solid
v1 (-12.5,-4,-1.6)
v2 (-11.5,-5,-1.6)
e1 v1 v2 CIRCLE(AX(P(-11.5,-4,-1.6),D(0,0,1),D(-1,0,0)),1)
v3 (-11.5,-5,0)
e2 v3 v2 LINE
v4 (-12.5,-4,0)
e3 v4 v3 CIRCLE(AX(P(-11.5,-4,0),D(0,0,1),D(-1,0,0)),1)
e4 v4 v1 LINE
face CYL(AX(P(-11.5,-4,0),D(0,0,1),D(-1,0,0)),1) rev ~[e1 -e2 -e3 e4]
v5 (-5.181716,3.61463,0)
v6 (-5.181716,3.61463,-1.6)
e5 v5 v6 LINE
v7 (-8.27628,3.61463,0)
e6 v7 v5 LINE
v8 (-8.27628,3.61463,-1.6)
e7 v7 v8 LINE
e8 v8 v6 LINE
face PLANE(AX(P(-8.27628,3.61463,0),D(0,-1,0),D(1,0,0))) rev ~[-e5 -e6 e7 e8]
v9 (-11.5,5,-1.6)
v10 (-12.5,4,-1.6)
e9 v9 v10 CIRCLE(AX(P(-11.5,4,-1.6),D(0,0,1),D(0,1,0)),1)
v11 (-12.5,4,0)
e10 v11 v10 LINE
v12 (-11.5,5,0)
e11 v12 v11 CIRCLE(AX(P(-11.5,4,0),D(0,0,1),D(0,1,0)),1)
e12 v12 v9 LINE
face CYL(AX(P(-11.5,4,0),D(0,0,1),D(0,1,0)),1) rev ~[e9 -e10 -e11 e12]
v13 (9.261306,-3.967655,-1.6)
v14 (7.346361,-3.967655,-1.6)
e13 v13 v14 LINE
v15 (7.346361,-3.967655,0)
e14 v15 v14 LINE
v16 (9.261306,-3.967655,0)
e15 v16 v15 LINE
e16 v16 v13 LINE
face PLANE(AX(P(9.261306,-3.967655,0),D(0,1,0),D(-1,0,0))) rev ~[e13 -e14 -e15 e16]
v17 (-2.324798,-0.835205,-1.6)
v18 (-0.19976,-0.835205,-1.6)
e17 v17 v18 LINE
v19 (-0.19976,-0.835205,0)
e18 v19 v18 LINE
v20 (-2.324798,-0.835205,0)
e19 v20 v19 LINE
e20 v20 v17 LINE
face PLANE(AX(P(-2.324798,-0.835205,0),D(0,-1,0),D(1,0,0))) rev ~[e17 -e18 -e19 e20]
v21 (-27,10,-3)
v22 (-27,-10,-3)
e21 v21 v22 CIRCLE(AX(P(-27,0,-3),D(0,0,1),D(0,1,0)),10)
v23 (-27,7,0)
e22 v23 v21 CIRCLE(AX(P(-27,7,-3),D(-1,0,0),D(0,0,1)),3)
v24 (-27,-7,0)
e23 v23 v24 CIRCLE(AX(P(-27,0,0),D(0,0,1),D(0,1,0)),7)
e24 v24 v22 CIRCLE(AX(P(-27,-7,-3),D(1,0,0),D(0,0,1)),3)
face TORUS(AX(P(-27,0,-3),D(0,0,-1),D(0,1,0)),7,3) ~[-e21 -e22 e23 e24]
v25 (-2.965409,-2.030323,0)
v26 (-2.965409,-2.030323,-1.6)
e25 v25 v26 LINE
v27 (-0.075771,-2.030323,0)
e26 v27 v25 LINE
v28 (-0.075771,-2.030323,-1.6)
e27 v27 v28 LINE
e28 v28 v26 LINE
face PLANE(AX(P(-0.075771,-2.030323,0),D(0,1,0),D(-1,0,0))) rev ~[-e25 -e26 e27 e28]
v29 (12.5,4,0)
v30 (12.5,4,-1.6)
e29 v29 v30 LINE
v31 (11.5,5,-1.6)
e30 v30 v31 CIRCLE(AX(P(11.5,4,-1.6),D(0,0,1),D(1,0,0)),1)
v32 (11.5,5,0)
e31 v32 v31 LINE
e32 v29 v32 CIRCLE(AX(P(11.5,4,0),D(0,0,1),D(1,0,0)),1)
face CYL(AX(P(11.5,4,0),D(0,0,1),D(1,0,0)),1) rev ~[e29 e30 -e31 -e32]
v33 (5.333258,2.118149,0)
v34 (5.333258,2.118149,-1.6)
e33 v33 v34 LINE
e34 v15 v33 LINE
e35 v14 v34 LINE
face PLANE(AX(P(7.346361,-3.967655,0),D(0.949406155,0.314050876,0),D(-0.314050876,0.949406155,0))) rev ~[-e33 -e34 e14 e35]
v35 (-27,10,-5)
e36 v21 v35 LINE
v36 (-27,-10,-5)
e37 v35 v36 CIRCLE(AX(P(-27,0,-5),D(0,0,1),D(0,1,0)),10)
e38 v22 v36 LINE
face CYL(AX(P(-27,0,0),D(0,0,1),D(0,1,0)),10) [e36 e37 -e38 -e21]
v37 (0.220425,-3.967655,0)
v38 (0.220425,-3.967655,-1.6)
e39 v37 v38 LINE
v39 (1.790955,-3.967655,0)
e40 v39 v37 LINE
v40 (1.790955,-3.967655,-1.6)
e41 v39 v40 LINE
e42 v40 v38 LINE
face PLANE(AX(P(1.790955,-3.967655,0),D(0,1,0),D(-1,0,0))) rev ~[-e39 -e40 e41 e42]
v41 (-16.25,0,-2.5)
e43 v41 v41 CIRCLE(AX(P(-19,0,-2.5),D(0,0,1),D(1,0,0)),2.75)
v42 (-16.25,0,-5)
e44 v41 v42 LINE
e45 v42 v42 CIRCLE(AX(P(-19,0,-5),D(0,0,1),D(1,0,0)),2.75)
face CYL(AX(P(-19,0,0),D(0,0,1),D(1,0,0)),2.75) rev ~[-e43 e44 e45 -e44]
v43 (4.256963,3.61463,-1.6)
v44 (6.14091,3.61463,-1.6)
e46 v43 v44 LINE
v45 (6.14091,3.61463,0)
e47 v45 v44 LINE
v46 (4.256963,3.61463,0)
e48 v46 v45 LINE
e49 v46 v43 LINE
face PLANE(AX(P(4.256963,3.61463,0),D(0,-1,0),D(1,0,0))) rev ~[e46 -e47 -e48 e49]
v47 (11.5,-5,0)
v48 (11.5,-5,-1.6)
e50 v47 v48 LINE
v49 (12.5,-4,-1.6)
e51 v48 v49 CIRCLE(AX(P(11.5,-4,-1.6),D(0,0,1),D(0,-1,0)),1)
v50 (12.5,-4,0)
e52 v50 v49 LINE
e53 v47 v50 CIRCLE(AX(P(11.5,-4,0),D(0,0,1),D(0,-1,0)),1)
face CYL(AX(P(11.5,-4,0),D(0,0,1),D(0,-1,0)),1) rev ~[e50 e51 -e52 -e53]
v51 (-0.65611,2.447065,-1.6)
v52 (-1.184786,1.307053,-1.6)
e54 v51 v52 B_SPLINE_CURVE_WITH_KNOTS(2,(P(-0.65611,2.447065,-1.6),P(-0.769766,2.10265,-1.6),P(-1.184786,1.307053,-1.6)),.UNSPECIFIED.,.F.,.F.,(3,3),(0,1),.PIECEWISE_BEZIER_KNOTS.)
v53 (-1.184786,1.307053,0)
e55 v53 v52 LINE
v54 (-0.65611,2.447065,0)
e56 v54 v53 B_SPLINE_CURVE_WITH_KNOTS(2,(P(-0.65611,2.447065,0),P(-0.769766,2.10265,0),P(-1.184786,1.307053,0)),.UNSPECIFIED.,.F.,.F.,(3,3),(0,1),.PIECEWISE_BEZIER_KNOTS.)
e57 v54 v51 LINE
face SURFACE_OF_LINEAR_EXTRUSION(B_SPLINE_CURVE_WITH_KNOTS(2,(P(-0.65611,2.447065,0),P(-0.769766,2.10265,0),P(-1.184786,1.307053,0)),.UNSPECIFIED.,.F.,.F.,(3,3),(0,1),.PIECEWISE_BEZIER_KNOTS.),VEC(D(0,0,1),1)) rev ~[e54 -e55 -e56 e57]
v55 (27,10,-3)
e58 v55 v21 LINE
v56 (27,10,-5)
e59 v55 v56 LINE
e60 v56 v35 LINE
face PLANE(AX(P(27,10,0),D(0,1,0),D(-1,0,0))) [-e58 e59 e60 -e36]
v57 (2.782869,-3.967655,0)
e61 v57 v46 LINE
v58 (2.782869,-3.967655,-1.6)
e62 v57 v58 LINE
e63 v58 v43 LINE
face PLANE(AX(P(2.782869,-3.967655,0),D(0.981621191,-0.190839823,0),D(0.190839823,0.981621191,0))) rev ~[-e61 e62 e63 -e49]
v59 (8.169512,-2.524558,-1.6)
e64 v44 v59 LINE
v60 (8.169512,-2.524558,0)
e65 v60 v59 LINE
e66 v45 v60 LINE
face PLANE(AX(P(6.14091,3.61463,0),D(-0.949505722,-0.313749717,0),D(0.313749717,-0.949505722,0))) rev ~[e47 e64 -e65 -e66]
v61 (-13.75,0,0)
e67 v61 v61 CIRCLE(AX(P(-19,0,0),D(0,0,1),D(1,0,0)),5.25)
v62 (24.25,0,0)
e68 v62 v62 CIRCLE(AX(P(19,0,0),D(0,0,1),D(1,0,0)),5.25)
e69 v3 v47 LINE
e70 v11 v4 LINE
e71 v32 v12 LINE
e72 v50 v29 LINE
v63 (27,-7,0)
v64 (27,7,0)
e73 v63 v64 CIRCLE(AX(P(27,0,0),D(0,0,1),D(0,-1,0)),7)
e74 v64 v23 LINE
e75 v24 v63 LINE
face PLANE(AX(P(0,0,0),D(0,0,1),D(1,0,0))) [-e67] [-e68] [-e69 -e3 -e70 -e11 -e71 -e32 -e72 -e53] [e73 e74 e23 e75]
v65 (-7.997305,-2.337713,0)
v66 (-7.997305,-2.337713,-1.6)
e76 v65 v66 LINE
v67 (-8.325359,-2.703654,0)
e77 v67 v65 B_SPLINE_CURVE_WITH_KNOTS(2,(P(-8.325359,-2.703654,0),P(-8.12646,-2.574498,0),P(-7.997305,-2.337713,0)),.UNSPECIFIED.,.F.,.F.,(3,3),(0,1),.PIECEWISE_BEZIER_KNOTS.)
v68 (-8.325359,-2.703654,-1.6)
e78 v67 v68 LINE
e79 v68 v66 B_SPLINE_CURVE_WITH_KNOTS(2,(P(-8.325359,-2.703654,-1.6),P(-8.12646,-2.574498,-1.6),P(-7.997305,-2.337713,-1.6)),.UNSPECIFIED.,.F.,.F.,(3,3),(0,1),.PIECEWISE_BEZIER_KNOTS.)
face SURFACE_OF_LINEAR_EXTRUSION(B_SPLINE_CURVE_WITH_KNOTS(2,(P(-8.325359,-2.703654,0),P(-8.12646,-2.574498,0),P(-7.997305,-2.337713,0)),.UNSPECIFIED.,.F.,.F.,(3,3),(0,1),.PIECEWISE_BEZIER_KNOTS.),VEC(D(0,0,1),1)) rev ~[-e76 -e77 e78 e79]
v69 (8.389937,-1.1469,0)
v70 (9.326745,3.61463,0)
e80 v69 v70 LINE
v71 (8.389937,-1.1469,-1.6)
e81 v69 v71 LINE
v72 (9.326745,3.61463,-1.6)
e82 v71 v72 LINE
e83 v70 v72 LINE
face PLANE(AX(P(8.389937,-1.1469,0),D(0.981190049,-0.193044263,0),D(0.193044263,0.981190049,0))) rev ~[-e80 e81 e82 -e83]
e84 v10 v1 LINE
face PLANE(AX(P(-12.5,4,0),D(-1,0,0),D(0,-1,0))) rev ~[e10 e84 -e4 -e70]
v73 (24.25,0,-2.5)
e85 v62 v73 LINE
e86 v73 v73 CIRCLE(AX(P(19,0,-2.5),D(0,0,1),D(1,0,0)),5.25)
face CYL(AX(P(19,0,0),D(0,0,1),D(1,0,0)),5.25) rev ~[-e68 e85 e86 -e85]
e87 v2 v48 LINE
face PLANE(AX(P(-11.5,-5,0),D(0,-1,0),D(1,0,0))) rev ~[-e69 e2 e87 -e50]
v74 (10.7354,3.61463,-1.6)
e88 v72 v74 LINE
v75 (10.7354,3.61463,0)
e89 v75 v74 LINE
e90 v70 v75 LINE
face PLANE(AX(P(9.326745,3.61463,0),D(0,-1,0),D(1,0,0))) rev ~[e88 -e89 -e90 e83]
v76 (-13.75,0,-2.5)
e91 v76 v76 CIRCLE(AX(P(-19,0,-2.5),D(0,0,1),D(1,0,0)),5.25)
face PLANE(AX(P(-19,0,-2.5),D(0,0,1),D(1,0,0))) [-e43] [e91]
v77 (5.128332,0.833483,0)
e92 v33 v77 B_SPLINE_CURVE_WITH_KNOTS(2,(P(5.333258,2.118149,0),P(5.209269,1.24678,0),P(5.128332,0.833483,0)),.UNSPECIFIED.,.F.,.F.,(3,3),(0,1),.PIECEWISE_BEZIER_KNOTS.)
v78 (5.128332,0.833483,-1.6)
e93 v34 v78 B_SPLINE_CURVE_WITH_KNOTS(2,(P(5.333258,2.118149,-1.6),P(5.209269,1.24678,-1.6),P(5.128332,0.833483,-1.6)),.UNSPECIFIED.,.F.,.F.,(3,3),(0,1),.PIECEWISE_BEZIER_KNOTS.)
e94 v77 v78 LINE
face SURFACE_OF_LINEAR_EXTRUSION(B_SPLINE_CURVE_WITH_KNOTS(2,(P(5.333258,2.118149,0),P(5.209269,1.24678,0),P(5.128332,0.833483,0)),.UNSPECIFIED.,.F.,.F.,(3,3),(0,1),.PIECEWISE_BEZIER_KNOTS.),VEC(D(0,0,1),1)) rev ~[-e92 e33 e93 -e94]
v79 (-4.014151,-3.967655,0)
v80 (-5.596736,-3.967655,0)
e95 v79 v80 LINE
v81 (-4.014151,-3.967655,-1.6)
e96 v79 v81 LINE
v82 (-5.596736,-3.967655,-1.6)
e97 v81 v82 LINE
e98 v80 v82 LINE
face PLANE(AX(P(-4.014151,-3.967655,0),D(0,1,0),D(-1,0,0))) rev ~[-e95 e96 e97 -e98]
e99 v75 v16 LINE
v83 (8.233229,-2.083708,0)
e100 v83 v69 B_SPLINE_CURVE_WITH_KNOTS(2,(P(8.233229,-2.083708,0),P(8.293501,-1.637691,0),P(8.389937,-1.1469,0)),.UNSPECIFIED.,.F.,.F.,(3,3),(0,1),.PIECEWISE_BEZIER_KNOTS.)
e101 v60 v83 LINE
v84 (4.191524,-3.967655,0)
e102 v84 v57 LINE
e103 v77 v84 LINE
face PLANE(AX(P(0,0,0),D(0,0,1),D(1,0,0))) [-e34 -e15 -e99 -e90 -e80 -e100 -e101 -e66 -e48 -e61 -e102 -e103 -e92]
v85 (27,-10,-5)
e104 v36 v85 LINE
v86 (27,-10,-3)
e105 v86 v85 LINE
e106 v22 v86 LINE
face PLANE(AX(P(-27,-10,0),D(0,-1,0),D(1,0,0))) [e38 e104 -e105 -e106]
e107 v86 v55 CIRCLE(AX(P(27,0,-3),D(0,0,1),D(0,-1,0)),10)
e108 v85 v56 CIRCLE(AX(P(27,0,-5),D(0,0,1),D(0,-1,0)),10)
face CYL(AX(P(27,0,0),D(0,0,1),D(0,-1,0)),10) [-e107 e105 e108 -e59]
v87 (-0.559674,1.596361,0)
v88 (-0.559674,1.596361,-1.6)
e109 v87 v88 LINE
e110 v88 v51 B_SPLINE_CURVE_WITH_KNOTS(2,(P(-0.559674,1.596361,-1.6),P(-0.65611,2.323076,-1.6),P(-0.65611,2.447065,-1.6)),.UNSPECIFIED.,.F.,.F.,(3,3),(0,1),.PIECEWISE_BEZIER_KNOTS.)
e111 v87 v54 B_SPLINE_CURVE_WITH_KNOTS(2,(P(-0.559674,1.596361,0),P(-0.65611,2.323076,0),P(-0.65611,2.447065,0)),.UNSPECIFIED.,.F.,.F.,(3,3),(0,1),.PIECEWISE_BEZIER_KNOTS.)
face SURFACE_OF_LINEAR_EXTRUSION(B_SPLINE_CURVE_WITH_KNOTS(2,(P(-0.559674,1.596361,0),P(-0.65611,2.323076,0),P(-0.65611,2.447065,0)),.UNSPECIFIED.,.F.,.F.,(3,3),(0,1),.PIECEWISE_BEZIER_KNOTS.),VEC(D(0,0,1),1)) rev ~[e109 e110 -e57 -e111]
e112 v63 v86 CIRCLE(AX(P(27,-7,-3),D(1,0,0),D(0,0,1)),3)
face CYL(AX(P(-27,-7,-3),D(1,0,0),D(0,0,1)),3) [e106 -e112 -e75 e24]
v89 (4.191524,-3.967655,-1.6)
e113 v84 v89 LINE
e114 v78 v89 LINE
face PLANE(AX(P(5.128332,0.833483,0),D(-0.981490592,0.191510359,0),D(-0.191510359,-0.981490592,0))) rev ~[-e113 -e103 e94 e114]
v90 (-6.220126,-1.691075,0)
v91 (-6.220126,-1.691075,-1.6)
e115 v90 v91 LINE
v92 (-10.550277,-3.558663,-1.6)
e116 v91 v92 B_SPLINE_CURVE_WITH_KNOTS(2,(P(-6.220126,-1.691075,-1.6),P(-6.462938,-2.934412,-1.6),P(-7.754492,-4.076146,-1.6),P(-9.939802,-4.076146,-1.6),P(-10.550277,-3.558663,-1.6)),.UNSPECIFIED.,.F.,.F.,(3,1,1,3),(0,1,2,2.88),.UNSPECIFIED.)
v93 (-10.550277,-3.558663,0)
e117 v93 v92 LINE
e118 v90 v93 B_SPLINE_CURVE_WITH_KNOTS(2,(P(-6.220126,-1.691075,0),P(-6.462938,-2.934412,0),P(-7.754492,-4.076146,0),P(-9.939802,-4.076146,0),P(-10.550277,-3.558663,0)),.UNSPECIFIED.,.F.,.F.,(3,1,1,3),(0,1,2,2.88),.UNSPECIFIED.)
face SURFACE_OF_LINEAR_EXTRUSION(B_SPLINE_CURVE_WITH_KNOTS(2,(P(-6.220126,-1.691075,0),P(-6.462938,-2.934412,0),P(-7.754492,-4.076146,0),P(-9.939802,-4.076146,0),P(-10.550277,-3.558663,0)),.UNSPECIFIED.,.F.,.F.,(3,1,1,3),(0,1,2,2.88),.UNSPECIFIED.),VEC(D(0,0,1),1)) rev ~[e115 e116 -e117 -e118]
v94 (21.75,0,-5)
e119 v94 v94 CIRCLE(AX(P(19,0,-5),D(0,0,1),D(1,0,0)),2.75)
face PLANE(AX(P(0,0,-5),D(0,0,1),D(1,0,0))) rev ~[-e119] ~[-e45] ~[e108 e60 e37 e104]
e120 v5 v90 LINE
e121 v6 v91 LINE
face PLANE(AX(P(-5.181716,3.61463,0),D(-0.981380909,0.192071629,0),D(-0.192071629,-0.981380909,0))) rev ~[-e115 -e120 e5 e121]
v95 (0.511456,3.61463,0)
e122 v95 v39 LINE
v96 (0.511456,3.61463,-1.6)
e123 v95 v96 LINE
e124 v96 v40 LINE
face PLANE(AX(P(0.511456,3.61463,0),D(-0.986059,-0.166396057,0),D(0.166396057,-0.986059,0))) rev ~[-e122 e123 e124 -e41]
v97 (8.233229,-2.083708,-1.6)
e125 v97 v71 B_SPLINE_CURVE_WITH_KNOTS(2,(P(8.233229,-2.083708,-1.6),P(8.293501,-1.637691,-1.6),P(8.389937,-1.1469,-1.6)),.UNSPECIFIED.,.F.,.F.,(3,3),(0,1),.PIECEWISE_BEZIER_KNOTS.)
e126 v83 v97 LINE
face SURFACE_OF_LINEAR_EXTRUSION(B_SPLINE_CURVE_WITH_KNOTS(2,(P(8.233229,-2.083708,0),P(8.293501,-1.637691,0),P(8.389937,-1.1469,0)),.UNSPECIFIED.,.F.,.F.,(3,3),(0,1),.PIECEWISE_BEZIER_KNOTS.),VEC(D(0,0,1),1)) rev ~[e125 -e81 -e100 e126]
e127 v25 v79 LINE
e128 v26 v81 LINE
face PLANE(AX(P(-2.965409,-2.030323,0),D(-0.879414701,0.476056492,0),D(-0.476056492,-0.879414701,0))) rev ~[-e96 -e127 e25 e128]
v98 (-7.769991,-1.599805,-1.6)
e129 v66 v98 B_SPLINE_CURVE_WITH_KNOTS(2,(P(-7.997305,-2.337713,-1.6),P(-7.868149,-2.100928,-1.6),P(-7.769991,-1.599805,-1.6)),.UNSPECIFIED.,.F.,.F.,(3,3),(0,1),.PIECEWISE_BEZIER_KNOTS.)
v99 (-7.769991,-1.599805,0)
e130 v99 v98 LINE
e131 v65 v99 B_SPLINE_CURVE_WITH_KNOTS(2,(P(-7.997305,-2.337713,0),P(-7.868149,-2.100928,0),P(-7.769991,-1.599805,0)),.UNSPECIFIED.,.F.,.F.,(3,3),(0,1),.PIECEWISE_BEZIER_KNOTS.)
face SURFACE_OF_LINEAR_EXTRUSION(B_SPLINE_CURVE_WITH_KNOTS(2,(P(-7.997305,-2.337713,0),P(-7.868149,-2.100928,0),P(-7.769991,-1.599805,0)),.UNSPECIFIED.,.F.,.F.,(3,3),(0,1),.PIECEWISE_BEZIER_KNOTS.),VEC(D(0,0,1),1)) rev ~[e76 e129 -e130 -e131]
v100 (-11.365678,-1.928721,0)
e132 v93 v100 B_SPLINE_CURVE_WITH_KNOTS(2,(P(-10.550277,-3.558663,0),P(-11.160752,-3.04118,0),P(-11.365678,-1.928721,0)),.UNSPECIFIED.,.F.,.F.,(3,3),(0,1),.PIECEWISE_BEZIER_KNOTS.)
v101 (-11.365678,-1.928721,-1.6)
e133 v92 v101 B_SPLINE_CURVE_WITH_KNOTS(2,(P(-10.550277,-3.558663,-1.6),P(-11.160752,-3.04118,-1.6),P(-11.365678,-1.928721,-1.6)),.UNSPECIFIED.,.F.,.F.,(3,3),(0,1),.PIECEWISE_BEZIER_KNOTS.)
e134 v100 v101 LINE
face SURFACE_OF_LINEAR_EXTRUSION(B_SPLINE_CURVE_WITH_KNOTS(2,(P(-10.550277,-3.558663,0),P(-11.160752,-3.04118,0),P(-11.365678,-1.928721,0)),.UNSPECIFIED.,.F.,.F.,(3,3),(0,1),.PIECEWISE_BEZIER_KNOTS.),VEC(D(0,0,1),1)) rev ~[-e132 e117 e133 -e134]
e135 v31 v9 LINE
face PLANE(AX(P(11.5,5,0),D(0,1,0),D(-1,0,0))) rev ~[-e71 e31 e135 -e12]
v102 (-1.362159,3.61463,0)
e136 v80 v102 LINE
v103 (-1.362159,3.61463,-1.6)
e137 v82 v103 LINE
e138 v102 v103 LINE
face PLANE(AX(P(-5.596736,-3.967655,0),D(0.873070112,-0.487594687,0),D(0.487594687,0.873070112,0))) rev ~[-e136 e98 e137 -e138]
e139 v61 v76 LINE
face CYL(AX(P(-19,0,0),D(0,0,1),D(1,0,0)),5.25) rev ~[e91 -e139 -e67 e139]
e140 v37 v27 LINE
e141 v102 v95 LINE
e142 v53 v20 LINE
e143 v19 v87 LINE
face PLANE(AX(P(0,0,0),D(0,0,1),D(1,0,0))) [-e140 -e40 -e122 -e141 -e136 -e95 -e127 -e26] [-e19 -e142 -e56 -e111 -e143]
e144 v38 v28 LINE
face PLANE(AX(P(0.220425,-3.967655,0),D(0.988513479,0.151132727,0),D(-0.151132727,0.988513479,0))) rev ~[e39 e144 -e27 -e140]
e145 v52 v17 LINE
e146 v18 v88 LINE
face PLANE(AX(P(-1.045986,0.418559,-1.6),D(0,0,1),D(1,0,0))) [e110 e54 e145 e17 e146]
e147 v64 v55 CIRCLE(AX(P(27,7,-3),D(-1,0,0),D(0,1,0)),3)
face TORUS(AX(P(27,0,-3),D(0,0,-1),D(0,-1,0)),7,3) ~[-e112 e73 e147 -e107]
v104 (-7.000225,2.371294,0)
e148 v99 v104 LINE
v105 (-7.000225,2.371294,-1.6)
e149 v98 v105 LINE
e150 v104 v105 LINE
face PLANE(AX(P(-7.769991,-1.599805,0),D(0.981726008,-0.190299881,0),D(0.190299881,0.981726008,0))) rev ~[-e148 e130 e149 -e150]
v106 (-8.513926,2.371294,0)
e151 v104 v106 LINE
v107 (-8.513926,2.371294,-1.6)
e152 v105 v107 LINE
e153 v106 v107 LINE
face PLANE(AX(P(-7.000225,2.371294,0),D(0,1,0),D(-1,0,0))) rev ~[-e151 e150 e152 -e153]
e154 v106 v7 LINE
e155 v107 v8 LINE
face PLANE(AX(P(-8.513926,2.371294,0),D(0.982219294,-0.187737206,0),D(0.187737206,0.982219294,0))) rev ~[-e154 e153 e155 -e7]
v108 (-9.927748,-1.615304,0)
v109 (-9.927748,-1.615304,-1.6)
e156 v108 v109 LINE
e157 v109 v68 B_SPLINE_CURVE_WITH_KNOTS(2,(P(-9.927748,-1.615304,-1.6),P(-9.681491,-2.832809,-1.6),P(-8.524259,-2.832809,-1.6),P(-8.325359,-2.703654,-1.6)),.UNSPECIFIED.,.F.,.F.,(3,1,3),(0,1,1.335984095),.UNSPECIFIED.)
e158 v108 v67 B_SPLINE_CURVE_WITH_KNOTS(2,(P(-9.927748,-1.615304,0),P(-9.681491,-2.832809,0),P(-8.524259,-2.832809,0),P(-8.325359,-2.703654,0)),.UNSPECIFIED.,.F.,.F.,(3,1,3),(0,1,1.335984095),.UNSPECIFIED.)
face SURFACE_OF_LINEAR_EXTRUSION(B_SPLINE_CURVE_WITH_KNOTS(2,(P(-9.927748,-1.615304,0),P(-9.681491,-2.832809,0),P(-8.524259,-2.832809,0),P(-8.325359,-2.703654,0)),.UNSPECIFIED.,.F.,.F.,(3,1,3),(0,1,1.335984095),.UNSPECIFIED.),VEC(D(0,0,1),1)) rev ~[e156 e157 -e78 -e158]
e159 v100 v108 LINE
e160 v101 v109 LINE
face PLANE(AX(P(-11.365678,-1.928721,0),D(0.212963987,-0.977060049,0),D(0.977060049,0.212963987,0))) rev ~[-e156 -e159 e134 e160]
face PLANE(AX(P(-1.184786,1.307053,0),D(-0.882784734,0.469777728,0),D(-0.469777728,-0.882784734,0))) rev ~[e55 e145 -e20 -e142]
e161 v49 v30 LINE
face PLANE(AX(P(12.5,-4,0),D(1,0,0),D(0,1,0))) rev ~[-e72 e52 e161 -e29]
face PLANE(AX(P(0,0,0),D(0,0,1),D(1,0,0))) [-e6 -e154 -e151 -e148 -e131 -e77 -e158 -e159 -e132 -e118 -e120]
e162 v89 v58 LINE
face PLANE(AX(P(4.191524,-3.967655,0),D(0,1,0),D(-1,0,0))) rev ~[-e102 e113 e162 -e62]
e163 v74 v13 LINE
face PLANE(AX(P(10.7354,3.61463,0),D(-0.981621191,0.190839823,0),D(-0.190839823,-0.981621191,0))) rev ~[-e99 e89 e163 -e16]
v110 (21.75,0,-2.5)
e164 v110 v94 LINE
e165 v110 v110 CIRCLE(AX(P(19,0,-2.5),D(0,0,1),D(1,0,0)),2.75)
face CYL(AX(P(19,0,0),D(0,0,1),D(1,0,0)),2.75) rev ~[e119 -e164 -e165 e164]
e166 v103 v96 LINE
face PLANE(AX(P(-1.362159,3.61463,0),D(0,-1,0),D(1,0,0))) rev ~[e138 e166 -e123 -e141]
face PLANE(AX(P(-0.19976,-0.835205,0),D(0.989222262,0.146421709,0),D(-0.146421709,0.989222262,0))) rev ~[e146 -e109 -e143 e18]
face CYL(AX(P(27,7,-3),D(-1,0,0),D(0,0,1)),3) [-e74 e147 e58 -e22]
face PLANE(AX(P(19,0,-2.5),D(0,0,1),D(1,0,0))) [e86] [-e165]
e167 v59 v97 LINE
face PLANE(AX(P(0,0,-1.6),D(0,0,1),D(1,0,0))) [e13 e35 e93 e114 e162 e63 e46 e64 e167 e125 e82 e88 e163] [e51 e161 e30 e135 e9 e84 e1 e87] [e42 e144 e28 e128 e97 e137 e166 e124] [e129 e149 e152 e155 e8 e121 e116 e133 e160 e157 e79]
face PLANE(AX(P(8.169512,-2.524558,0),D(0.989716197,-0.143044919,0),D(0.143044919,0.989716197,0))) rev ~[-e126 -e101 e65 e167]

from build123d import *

# Parameters (mm, degrees)
F0_R     = 5.25
F0_R_2   = 2.75
F1_DEPTH = 5
F2_DEPTH = 2.5
F4_R     = 3
F6_DEPTH = 1.6


with BuildPart() as f1:
    # F0 (on Top) → F1 (new body)
    with BuildSketch(Plane.XY):
        with BuildLine():
            Line((27, 10), (-27, 10))
            ThreePointArc((-27, 10), (-37, 0), (-27, -10))
            Line((-27, -10), (27, -10))
            ThreePointArc((27, -10), (37, 0), (27, 10))
        make_face()
        with Locations((-19, 0)):
            Circle(F0_R, mode=Mode.SUBTRACT)
        with Locations((19, 0)):
            Circle(F0_R, mode=Mode.SUBTRACT)
        with Locations((-19, 0)):
            Circle(F0_R)
        with Locations((-19, 0)):
            Circle(F0_R_2, mode=Mode.SUBTRACT)
        with Locations((19, 0)):
            Circle(F0_R)
        with Locations((19, 0)):
            Circle(F0_R_2, mode=Mode.SUBTRACT)
    extrude(amount=-F1_DEPTH)

    # F0 (on Top) → F2 (cut)
    with BuildSketch(Plane.XY):
        with Locations((-19, 0)):
            Circle(F0_R)
        with Locations((-19, 0)):
            Circle(F0_R_2, mode=Mode.SUBTRACT)
        with Locations((19, 0)):
            Circle(F0_R)
        with Locations((19, 0)):
            Circle(F0_R_2, mode=Mode.SUBTRACT)
    extrude(amount=-F2_DEPTH, mode=Mode.SUBTRACT)

    # F4
    f4_edges = [f1.edges().sort_by_distance(p)[0] for p in [
        (0, -10, 0),
        (0, 10, 0),
    ]]
    fillet(f4_edges, radius=F4_R)

    # F5 (on face) → F6 (cut)
    with BuildSketch(Plane.XY):
        with BuildLine():
            Line((11.5, 5), (-11.5, 5))
            ThreePointArc((-11.5, 5), (-12.2071067812, 4.7071067812), (-12.5, 4))
            Line((-12.5, 4), (-12.5, -4))
            ThreePointArc((-12.5, -4), (-12.2071067812, -4.7071067812), (-11.5, -5))
            Line((-11.5, -5), (11.5, -5))
            ThreePointArc((11.5, -5), (12.2071067812, -4.7071067812), (12.5, -4))
            Line((12.5, -4), (12.5, 4))
            ThreePointArc((12.5, 4), (12.2071067812, 4.7071067812), (11.5, 5))
        make_face()
        with BuildLine():
            add(Edge.make_bspline(
                [(-7.1087151842, -3.5052785265), (-7.754492363, -4.0761455526), (-8.9168912848, -4.0761455526)],
                knots=[0, 0, 0, 1, 1, 1], degree=2))
            add(Edge.make_bspline(
                [(-8.9168912848, -4.0761455526), (-9.939802336, -4.0761455526), (-10.5502770291, -3.5586627733)],
                knots=[0, 0, 0, 1, 1, 1], degree=2))
            add(Edge.make_bspline(
                [(-10.5502770291, -3.5586627733), (-11.1607517221, -3.041179994), (-11.3656783468, -1.928721174)],
                knots=[0, 0, 0, 1, 1, 1], degree=2))
            Line((-11.3656783468, -1.928721174), (-9.9277478287, -1.6153039832))
            add(Edge.make_bspline(
                [(-9.9277478287, -1.6153039832), (-9.6814914645, -2.8328092243), (-8.8152890087, -2.8328092243)],
                knots=[0, 0, 0, 1, 1, 1], degree=2))
            add(Edge.make_bspline(
                [(-8.8152890087, -2.8328092243), (-8.5242587601, -2.8328092243), (-8.325359389, -2.7036537886)],
                knots=[0, 0, 0, 1, 1, 1], degree=2))
            add(Edge.make_bspline(
                [(-8.325359389, -2.7036537886), (-8.126460018, -2.5744983528), (-7.9973045822, -2.3377133872)],
                knots=[0, 0, 0, 1, 1, 1], degree=2))
            add(Edge.make_bspline(
                [(-7.9973045822, -2.3377133872), (-7.8681491465, -2.1009284217), (-7.7699910153, -1.5998053309)],
                knots=[0, 0, 0, 1, 1, 1], degree=2))
            Line((-7.7699910153, -1.5998053309), (-7.0002246181, 2.3712938005))
            Line((-7.0002246181, 2.3712938005), (-8.5139263252, 2.3712938005))
            Line((-8.5139263252, 2.3712938005), (-8.2762803235, 3.6146301288))
            Line((-8.2762803235, 3.6146301288), (-5.1817160827, 3.6146301288))
            Line((-5.1817160827, 3.6146301288), (-6.2201257862, -1.6910751722))
            add(Edge.make_bspline(
                [(-6.2201257862, -1.6910751722), (-6.4629380054, -2.9344115004), (-7.1087151842, -3.5052785265)],
                knots=[0, 0, 0, 1, 1, 1], degree=2))
        make_face(mode=Mode.SUBTRACT)
        Polygon((1.7909553759, -3.9676549865), (0.220425277, -3.9676549865), (-0.075771189, -2.0303234501), (-2.965408805, -2.0303234501), (-4.0141509434, -3.9676549865), (-5.5967355496, -3.9676549865), (-1.3621593291, 3.6146301288), (0.5114555256, 3.6146301288), align=None, mode=Mode.SUBTRACT)
        with BuildLine():
            Line((9.2613057802, -3.9676549865), (7.346361186, -3.9676549865))
            Line((7.346361186, -3.9676549865), (5.3332584606, 2.1181491465))
            add(Edge.make_bspline(
                [(5.3332584606, 2.1181491465), (5.2092692423, 1.2467804732), (5.1283318359, 0.8334830788)],
                knots=[0, 0, 0, 1, 1, 1], degree=2))
            Line((5.1283318359, 0.8334830788), (4.1915244085, -3.9676549865))
            Line((4.1915244085, -3.9676549865), (2.7828691225, -3.9676549865))
            Line((2.7828691225, -3.9676549865), (4.2569631626, 3.6146301288))
            Line((4.2569631626, 3.6146301288), (6.1409104522, 3.6146301288))
            Line((6.1409104522, 3.6146301288), (8.1695118299, -2.524558251))
            Line((8.1695118299, -2.524558251), (8.2332285115, -2.0837076969))
            add(Edge.make_bspline(
                [(8.2332285115, -2.0837076969), (8.2935010482, -1.6376909254), (8.3899371069, -1.1469002695)],
                knots=[0, 0, 0, 1, 1, 1], degree=2))
            Line((8.3899371069, -1.1469002695), (9.3267445343, 3.6146301288))
            Line((9.3267445343, 3.6146301288), (10.7353998203, 3.6146301288))
            Line((10.7353998203, 3.6146301288), (9.2613057802, -3.9676549865))
        make_face(mode=Mode.SUBTRACT)
        with BuildLine():
            add(Edge.make_bspline(
                [(-0.559673555, 1.596361186), (-0.6561096137, 2.3230757712), (-0.6561096137, 2.4470649895)],
                knots=[0, 0, 0, 1, 1, 1], degree=2))
            add(Edge.make_bspline(
                [(-0.6561096137, 2.4470649895), (-0.7697663971, 2.1026504942), (-1.184785864, 1.3070530099)],
                knots=[0, 0, 0, 1, 1, 1], degree=2))
            Line((-1.184785864, 1.3070530099), (-2.3247978437, -0.8352051512))
            Line((-2.3247978437, -0.8352051512), (-0.1997604073, -0.8352051512))
            Line((-0.1997604073, -0.8352051512), (-0.559673555, 1.596361186))
        make_face()
    extrude(amount=-F6_DEPTH, mode=Mode.SUBTRACT)


solid = f1.part
